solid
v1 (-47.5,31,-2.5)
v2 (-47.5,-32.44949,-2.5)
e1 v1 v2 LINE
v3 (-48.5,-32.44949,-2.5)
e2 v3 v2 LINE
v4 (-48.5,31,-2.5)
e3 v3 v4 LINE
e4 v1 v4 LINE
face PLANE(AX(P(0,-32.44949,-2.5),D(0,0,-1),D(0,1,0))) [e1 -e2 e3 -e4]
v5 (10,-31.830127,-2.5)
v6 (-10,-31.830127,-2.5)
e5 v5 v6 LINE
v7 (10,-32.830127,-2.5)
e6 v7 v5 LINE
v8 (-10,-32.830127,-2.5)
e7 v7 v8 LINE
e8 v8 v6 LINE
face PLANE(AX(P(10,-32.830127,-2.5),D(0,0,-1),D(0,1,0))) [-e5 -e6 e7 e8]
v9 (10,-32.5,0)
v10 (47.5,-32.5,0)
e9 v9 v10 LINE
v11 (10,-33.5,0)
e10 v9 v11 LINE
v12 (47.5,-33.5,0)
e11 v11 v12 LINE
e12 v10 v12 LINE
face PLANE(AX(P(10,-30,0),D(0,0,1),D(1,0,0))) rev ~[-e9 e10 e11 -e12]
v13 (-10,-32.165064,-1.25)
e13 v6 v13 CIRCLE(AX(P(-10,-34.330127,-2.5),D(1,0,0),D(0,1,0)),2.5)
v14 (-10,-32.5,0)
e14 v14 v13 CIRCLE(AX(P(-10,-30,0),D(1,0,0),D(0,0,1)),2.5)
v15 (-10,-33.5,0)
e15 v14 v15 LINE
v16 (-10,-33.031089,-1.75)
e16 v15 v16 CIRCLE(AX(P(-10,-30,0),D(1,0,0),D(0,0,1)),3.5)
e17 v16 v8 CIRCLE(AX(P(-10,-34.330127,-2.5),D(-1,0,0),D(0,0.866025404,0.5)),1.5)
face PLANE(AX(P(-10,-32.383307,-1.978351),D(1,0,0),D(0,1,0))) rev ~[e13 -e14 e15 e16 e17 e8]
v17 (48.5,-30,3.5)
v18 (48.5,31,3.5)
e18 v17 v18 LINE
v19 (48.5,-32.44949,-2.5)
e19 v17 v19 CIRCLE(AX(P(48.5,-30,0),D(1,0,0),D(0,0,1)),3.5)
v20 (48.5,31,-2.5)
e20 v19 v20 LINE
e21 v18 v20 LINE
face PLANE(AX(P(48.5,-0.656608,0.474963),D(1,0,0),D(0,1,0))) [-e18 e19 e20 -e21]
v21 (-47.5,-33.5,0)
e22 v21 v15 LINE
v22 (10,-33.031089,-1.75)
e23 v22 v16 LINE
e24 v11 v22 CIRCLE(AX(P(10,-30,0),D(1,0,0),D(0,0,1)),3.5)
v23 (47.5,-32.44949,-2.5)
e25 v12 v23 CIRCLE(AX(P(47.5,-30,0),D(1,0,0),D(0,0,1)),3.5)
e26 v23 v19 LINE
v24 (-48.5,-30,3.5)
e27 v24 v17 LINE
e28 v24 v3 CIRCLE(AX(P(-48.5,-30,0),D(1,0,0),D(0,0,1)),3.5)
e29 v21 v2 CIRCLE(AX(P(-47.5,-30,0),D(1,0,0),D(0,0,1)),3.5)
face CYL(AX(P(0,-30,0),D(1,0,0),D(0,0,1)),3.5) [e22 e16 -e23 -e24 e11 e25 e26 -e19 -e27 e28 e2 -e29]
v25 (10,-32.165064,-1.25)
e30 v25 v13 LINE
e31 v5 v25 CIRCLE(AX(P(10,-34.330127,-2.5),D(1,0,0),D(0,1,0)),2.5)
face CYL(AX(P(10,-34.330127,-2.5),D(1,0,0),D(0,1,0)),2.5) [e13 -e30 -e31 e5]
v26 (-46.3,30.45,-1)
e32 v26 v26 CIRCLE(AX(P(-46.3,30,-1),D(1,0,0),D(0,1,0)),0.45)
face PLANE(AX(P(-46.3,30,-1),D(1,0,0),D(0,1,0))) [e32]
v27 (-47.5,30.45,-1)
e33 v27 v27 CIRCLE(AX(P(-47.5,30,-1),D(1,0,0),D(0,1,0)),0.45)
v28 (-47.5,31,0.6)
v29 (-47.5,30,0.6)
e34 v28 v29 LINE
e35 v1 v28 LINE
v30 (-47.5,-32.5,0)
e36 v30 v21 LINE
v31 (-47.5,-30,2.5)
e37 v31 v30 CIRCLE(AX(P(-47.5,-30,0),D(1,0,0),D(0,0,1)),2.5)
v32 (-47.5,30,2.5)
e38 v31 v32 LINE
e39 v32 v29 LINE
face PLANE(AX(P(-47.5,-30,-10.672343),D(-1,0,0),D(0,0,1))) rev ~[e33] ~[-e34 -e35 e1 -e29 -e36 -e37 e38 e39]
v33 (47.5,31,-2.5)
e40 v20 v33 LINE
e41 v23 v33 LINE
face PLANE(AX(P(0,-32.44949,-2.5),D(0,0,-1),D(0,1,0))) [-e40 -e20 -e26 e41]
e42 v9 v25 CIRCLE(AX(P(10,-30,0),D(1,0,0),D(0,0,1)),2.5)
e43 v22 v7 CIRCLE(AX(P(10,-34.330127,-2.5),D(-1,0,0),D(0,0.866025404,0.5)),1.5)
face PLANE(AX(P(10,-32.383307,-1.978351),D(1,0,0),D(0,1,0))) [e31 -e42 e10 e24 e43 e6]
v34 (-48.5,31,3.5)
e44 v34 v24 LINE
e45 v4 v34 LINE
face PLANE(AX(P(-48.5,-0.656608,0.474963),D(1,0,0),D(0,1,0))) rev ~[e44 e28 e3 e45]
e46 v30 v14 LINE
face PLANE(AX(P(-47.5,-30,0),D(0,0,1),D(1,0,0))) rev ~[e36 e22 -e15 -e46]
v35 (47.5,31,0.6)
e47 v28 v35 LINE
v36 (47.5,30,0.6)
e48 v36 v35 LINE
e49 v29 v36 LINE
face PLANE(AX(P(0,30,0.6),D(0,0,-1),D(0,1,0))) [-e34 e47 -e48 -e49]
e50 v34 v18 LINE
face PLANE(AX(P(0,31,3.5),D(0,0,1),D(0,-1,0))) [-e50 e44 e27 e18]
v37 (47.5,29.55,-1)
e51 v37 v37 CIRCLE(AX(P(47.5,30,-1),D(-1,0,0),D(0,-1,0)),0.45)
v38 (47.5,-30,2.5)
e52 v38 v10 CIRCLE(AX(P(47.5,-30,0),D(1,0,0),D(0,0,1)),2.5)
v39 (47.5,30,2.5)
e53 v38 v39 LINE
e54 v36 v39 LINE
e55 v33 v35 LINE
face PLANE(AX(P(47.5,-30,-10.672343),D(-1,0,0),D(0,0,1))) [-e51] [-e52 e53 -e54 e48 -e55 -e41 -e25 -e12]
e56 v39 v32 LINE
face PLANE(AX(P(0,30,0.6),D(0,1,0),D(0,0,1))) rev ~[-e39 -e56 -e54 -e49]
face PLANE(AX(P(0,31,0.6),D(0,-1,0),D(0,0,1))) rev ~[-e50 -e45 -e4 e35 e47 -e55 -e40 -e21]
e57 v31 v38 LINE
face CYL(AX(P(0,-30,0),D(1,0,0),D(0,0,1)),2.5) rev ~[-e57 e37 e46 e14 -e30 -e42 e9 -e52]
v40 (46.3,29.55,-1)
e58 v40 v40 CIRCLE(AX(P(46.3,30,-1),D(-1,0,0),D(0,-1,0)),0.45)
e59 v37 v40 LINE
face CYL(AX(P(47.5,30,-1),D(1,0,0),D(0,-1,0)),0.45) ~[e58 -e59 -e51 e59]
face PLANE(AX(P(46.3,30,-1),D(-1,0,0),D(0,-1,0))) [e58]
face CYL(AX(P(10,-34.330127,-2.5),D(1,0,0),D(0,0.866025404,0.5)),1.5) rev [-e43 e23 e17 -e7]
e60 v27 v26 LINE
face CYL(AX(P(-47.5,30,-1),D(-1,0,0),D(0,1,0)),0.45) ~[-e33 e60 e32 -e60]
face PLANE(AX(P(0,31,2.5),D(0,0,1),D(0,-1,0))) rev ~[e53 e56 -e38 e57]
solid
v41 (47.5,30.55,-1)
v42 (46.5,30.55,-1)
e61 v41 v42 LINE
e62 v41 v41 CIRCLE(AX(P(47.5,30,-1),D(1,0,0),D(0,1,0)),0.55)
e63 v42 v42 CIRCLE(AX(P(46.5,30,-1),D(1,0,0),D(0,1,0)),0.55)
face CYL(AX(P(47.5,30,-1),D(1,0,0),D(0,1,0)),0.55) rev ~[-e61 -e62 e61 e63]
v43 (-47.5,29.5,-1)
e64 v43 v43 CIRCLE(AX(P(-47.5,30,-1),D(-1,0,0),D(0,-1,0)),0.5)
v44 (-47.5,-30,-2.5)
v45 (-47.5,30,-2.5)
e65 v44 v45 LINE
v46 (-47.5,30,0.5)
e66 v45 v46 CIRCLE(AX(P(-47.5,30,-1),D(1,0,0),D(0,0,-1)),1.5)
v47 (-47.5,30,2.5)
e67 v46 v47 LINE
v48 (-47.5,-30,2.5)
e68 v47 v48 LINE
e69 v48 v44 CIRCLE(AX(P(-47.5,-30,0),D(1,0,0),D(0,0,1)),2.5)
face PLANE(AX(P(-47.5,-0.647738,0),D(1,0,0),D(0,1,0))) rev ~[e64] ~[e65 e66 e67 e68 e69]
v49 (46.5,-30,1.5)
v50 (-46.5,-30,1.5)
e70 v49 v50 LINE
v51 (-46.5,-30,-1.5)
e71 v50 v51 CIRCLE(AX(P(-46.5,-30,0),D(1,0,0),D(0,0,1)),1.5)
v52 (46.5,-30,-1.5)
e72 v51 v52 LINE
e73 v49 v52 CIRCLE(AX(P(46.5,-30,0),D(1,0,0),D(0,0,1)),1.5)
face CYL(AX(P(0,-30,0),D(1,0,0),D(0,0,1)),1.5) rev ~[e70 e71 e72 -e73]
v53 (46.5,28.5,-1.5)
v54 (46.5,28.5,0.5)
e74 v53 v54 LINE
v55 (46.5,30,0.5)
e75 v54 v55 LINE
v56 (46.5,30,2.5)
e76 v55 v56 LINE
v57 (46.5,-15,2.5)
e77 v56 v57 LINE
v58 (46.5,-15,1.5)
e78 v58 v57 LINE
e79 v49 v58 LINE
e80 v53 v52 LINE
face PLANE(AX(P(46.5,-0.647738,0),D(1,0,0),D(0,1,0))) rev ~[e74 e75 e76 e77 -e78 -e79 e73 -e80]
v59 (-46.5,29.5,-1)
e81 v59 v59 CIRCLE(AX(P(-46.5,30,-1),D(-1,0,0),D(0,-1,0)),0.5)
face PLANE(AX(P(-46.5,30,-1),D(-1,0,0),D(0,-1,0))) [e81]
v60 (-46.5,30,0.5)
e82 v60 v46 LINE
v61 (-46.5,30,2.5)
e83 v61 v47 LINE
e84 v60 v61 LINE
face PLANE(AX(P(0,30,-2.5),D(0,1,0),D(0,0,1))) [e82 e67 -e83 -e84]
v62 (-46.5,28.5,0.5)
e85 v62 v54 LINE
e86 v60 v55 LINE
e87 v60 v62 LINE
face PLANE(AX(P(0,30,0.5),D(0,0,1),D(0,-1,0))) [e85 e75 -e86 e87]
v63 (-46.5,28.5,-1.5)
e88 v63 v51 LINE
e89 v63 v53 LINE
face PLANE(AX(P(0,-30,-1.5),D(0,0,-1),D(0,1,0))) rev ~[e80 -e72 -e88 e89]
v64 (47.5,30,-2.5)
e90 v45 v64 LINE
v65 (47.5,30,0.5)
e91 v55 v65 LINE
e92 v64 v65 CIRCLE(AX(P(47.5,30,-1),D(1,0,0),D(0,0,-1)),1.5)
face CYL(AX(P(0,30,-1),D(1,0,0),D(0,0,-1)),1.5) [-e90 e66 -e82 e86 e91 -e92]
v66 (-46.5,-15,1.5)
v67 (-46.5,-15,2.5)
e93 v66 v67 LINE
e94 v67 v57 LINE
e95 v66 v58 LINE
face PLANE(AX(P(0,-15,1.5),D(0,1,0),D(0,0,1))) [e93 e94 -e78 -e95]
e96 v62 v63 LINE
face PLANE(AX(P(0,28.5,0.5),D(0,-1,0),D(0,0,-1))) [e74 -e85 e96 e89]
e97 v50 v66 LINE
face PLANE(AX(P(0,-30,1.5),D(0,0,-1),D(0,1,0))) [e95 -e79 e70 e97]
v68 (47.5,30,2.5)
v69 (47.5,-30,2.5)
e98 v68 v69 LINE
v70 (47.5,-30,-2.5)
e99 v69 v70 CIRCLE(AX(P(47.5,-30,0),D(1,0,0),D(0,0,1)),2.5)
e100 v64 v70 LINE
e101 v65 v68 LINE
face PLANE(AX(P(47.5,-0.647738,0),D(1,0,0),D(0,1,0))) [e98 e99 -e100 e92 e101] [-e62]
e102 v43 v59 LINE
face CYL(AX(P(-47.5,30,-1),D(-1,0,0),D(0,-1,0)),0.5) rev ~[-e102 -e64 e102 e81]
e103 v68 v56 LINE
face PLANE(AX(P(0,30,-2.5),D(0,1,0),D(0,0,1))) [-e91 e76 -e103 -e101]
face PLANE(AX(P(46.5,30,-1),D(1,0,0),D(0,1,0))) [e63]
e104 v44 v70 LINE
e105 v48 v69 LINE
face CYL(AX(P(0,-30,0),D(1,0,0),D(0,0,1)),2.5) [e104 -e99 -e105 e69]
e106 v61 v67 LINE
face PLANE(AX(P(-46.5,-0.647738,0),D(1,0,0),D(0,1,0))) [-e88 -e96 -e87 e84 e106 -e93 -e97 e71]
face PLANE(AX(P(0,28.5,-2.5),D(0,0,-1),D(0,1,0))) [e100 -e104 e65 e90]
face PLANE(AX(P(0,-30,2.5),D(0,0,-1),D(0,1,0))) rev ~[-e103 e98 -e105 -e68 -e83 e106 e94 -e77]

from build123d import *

# Parameters (mm, degrees)
F1_DEPTH       = 47.5
F2_T           = 1
F3_W           = 15
F3_H           = 1
F4_DEPTH       = 46.5
F4_DEPTH_BACK  = 46.5
F6_DEPTH       = 47.5
F6_DEPTH_BACK  = 47.5
F7_R           = 0.55
F8_DEPTH       = 1
F9_R           = 0.5
F10_DEPTH      = 1
F12_DEPTH      = 48.5
F13_T          = 1
F15_W          = 37.5
F15_H          = 10.6723425663
F16_DEPTH      = 144
F18_DEPTH      = 20
F20_DEPTH      = 20
F21_W          = 1
F21_H          = 2.9
F22_DEPTH      = 48.5
F22_DEPTH_BACK = 48.5
F23_R          = 0.45
F24_DEPTH      = 1.2
F25_R          = 0.45
F26_DEPTH      = 1.2


# Not quite as in the source:
# - an extrude ends at something that could not be found from the text; its depth is read off the source's solid
# - ends of sketch curves that miss each other by under 0.0002 mm in the source are joined
# - a shell that OpenCascade refuses in one call is made with other operations: the cavity is built on its own and cut out


with BuildPart() as f1:
    # F0 (on Right) → F1 (new body, symmetric)
    with BuildSketch(Plane.YZ):
        with BuildLine():
            Line((30, 2.5), (-30, 2.5))
            ThreePointArc((-30, 2.5), (-32.5, 0), (-30, -2.5))
            Line((-30, -2.5), (30, -2.5))
            Line((30, -2.5), (30, 2.5))
        make_face()
    extrude(amount=F1_DEPTH, both=True)

    # F2: shell of thickness 1, made by hand


with BuildPart() as f2_core1:
    # F2_t2: copy of F1
    add(f1.part)

    # the walls: a layer under each face that stays
    f2_faces = [f2_core1.faces().sort_by_distance(p)[0] for p in [
        (0, 0, -2.5),
        (47.5, -1.25, 0),
        (0, -32.5, 0),
        (-47.5, -1.25, 0),
    ]]
    thicken(f2_faces, amount=-F2_T, mode=Mode.SUBTRACT)


with BuildPart() as f1_1:
    add(f1.part)

    # what is left inside the walls is the cavity
    f2_cavity = [f2_core1.part.solids().sort_by_distance(p)[0] for p in [
        (-15.5, 0, 2.49),
    ]]
    add(f2_cavity, mode=Mode.SUBTRACT)

    # F3 (on Right) → F4 (join, two sides)
    with BuildSketch(Plane.YZ) as f4_sk:
        with Locations((-22.5, 2)):
            Rectangle(F3_W, F3_H)
    extrude(amount=F4_DEPTH)
    extrude(f4_sk.sketch, amount=-F4_DEPTH_BACK)

    # F5 (on Right) → F6 (join, two sides)
    with BuildSketch(Plane.YZ) as f6_sk:
        with BuildLine():
            Line((28.5, -2.5), (29.9848040611, -2.5))
            ThreePointArc((29.9848040611, -2.5), (29.9924019331, -2.4999807563), (30, -2.5))
            Line((30, -2.5), (30, 0.5))
            Line((30, 0.5), (28.5, 0.5))
            Line((28.5, 0.5), (28.5, -2.5))
        make_face()
        with BuildLine():
            Line((30, 0.5), (30, -2.5))
            ThreePointArc((30, -2.5), (31.5, -1), (30, 0.5))
        make_face()
    extrude(amount=F6_DEPTH)
    extrude(f6_sk.sketch, amount=-F6_DEPTH_BACK)

    # F7 (on face) → F8 (cut)
    with BuildSketch(Plane.YZ.offset(47.5)):
        with Locations((30, -1)):
            Circle(F7_R)
    extrude(amount=-F8_DEPTH, mode=Mode.SUBTRACT)

    # F9 (on face) → F10 (cut)
    with BuildSketch(Plane(origin=(-47.5, 0, 0), x_dir=(0, -1, 0), z_dir=(-1, 0, 0))):
        with Locations((-30, -1)):
            Circle(F9_R)
    extrude(amount=-F10_DEPTH, mode=Mode.SUBTRACT)


with BuildPart() as f12:
    # F11 (on Right) → F12 (new body, symmetric)
    with BuildSketch(Plane.YZ):
        with BuildLine():
            Line((31, 3.5), (-30, 3.5))
            ThreePointArc((-30, 3.5), (-33.2403703492, 1.3228756555), (-32.4494897428, -2.5))
            Line((-32.4494897428, -2.5), (-30, -2.5))
            Line((-30, -2.5), (31, -2.5))
            Line((31, -2.5), (31, 3.5))
        make_face()
    extrude(amount=F12_DEPTH, both=True)

    # F13: shell of thickness 1, made by hand


with BuildPart() as f13_core1:
    # F13_t2: copy of F12
    add(f12.part)

    # the walls: a layer under each face that stays
    f13_faces = [f13_core1.faces().sort_by_distance(p)[0] for p in [
        (0, 0.5, 3.5),
        (48.5, -1.25, 0.5),
        (0, -33.2403703492, 1.3228756555),
        (-48.5, -1.25, 0.5),
    ]]
    thicken(f13_faces, amount=-F13_T, mode=Mode.SUBTRACT)


with BuildPart() as f12_1:
    add(f12.part)

    # what is left inside the walls is the cavity
    f13_cavity = [f13_core1.part.solids().sort_by_distance(p)[0] for p in [
        (-15.833333, -0.724745, -2.49),
    ]]
    add(f13_cavity, mode=Mode.SUBTRACT)

    # F15 (on offset) → F16 (cut, through all)
    with BuildSketch(Plane.XZ.offset(30)):
        with Locations((-28.75, -5.3361712831)):
            Rectangle(F15_W, F15_H)
        with Locations((28.75, -5.3361712831)):
            Rectangle(F15_W, F15_H)
    extrude(amount=F16_DEPTH, mode=Mode.SUBTRACT)

    # F17 (on face) → F18 (cut, through all)
    with BuildSketch(Plane.YZ.offset(10)):
        with BuildLine():
            Line((-32.1650635095, -1.25), (-33.0310889132, -1.75))
            ThreePointArc((-33.0310889132, -1.75), (-32.7658290983, -2.1448052123), (-32.4494897428, -2.5))
            Line((-32.4494897428, -2.5), (-30, -2.5))
            ThreePointArc((-30, -2.5), (-31.25, -2.1650635095), (-32.1650635095, -1.25))
        make_face()
    extrude(amount=-F18_DEPTH, mode=Mode.SUBTRACT)

    # F19 (on face) → F20 (join, through all)
    with BuildSketch(Plane.YZ.offset(10)):
        with BuildLine():
            ThreePointArc((-33.0310889132, -1.75), (-32.8812382795, -2.1117714323), (-32.8301270189, -2.5))
            Line((-32.8301270189, -2.5), (-31.8301270189, -2.5))
            ThreePointArc((-31.8301270189, -2.5), (-31.9153124532, -1.8529523872), (-32.1650635095, -1.25))
            Line((-32.1650635095, -1.25), (-33.0310889132, -1.75))
        make_face()
    extrude(amount=-F20_DEPTH)

    # F21 (on Right) → F22 (join, two sides)
    with BuildSketch(Plane.YZ) as f22_sk:
        with Locations((30.5, 2.05)):
            Rectangle(F21_W, F21_H)
    extrude(amount=F22_DEPTH)
    extrude(f22_sk.sketch, amount=-F22_DEPTH_BACK)

    # F23 (on face) → F24 (join)
    with BuildSketch(Plane.YZ.offset(-47.5)):
        with Locations((30, -1)):
            Circle(F23_R)
    extrude(amount=F24_DEPTH)

    # F25 (on face) → F26 (join)
    with BuildSketch(Plane(origin=(47.5, 0, 0), x_dir=(0, -1, 0), z_dir=(-1, 0, 0))):
        with Locations((-30, -1)):
            Circle(F25_R)
    extrude(amount=F26_DEPTH)


solid = Compound([f1_1.part, f12_1.part])
